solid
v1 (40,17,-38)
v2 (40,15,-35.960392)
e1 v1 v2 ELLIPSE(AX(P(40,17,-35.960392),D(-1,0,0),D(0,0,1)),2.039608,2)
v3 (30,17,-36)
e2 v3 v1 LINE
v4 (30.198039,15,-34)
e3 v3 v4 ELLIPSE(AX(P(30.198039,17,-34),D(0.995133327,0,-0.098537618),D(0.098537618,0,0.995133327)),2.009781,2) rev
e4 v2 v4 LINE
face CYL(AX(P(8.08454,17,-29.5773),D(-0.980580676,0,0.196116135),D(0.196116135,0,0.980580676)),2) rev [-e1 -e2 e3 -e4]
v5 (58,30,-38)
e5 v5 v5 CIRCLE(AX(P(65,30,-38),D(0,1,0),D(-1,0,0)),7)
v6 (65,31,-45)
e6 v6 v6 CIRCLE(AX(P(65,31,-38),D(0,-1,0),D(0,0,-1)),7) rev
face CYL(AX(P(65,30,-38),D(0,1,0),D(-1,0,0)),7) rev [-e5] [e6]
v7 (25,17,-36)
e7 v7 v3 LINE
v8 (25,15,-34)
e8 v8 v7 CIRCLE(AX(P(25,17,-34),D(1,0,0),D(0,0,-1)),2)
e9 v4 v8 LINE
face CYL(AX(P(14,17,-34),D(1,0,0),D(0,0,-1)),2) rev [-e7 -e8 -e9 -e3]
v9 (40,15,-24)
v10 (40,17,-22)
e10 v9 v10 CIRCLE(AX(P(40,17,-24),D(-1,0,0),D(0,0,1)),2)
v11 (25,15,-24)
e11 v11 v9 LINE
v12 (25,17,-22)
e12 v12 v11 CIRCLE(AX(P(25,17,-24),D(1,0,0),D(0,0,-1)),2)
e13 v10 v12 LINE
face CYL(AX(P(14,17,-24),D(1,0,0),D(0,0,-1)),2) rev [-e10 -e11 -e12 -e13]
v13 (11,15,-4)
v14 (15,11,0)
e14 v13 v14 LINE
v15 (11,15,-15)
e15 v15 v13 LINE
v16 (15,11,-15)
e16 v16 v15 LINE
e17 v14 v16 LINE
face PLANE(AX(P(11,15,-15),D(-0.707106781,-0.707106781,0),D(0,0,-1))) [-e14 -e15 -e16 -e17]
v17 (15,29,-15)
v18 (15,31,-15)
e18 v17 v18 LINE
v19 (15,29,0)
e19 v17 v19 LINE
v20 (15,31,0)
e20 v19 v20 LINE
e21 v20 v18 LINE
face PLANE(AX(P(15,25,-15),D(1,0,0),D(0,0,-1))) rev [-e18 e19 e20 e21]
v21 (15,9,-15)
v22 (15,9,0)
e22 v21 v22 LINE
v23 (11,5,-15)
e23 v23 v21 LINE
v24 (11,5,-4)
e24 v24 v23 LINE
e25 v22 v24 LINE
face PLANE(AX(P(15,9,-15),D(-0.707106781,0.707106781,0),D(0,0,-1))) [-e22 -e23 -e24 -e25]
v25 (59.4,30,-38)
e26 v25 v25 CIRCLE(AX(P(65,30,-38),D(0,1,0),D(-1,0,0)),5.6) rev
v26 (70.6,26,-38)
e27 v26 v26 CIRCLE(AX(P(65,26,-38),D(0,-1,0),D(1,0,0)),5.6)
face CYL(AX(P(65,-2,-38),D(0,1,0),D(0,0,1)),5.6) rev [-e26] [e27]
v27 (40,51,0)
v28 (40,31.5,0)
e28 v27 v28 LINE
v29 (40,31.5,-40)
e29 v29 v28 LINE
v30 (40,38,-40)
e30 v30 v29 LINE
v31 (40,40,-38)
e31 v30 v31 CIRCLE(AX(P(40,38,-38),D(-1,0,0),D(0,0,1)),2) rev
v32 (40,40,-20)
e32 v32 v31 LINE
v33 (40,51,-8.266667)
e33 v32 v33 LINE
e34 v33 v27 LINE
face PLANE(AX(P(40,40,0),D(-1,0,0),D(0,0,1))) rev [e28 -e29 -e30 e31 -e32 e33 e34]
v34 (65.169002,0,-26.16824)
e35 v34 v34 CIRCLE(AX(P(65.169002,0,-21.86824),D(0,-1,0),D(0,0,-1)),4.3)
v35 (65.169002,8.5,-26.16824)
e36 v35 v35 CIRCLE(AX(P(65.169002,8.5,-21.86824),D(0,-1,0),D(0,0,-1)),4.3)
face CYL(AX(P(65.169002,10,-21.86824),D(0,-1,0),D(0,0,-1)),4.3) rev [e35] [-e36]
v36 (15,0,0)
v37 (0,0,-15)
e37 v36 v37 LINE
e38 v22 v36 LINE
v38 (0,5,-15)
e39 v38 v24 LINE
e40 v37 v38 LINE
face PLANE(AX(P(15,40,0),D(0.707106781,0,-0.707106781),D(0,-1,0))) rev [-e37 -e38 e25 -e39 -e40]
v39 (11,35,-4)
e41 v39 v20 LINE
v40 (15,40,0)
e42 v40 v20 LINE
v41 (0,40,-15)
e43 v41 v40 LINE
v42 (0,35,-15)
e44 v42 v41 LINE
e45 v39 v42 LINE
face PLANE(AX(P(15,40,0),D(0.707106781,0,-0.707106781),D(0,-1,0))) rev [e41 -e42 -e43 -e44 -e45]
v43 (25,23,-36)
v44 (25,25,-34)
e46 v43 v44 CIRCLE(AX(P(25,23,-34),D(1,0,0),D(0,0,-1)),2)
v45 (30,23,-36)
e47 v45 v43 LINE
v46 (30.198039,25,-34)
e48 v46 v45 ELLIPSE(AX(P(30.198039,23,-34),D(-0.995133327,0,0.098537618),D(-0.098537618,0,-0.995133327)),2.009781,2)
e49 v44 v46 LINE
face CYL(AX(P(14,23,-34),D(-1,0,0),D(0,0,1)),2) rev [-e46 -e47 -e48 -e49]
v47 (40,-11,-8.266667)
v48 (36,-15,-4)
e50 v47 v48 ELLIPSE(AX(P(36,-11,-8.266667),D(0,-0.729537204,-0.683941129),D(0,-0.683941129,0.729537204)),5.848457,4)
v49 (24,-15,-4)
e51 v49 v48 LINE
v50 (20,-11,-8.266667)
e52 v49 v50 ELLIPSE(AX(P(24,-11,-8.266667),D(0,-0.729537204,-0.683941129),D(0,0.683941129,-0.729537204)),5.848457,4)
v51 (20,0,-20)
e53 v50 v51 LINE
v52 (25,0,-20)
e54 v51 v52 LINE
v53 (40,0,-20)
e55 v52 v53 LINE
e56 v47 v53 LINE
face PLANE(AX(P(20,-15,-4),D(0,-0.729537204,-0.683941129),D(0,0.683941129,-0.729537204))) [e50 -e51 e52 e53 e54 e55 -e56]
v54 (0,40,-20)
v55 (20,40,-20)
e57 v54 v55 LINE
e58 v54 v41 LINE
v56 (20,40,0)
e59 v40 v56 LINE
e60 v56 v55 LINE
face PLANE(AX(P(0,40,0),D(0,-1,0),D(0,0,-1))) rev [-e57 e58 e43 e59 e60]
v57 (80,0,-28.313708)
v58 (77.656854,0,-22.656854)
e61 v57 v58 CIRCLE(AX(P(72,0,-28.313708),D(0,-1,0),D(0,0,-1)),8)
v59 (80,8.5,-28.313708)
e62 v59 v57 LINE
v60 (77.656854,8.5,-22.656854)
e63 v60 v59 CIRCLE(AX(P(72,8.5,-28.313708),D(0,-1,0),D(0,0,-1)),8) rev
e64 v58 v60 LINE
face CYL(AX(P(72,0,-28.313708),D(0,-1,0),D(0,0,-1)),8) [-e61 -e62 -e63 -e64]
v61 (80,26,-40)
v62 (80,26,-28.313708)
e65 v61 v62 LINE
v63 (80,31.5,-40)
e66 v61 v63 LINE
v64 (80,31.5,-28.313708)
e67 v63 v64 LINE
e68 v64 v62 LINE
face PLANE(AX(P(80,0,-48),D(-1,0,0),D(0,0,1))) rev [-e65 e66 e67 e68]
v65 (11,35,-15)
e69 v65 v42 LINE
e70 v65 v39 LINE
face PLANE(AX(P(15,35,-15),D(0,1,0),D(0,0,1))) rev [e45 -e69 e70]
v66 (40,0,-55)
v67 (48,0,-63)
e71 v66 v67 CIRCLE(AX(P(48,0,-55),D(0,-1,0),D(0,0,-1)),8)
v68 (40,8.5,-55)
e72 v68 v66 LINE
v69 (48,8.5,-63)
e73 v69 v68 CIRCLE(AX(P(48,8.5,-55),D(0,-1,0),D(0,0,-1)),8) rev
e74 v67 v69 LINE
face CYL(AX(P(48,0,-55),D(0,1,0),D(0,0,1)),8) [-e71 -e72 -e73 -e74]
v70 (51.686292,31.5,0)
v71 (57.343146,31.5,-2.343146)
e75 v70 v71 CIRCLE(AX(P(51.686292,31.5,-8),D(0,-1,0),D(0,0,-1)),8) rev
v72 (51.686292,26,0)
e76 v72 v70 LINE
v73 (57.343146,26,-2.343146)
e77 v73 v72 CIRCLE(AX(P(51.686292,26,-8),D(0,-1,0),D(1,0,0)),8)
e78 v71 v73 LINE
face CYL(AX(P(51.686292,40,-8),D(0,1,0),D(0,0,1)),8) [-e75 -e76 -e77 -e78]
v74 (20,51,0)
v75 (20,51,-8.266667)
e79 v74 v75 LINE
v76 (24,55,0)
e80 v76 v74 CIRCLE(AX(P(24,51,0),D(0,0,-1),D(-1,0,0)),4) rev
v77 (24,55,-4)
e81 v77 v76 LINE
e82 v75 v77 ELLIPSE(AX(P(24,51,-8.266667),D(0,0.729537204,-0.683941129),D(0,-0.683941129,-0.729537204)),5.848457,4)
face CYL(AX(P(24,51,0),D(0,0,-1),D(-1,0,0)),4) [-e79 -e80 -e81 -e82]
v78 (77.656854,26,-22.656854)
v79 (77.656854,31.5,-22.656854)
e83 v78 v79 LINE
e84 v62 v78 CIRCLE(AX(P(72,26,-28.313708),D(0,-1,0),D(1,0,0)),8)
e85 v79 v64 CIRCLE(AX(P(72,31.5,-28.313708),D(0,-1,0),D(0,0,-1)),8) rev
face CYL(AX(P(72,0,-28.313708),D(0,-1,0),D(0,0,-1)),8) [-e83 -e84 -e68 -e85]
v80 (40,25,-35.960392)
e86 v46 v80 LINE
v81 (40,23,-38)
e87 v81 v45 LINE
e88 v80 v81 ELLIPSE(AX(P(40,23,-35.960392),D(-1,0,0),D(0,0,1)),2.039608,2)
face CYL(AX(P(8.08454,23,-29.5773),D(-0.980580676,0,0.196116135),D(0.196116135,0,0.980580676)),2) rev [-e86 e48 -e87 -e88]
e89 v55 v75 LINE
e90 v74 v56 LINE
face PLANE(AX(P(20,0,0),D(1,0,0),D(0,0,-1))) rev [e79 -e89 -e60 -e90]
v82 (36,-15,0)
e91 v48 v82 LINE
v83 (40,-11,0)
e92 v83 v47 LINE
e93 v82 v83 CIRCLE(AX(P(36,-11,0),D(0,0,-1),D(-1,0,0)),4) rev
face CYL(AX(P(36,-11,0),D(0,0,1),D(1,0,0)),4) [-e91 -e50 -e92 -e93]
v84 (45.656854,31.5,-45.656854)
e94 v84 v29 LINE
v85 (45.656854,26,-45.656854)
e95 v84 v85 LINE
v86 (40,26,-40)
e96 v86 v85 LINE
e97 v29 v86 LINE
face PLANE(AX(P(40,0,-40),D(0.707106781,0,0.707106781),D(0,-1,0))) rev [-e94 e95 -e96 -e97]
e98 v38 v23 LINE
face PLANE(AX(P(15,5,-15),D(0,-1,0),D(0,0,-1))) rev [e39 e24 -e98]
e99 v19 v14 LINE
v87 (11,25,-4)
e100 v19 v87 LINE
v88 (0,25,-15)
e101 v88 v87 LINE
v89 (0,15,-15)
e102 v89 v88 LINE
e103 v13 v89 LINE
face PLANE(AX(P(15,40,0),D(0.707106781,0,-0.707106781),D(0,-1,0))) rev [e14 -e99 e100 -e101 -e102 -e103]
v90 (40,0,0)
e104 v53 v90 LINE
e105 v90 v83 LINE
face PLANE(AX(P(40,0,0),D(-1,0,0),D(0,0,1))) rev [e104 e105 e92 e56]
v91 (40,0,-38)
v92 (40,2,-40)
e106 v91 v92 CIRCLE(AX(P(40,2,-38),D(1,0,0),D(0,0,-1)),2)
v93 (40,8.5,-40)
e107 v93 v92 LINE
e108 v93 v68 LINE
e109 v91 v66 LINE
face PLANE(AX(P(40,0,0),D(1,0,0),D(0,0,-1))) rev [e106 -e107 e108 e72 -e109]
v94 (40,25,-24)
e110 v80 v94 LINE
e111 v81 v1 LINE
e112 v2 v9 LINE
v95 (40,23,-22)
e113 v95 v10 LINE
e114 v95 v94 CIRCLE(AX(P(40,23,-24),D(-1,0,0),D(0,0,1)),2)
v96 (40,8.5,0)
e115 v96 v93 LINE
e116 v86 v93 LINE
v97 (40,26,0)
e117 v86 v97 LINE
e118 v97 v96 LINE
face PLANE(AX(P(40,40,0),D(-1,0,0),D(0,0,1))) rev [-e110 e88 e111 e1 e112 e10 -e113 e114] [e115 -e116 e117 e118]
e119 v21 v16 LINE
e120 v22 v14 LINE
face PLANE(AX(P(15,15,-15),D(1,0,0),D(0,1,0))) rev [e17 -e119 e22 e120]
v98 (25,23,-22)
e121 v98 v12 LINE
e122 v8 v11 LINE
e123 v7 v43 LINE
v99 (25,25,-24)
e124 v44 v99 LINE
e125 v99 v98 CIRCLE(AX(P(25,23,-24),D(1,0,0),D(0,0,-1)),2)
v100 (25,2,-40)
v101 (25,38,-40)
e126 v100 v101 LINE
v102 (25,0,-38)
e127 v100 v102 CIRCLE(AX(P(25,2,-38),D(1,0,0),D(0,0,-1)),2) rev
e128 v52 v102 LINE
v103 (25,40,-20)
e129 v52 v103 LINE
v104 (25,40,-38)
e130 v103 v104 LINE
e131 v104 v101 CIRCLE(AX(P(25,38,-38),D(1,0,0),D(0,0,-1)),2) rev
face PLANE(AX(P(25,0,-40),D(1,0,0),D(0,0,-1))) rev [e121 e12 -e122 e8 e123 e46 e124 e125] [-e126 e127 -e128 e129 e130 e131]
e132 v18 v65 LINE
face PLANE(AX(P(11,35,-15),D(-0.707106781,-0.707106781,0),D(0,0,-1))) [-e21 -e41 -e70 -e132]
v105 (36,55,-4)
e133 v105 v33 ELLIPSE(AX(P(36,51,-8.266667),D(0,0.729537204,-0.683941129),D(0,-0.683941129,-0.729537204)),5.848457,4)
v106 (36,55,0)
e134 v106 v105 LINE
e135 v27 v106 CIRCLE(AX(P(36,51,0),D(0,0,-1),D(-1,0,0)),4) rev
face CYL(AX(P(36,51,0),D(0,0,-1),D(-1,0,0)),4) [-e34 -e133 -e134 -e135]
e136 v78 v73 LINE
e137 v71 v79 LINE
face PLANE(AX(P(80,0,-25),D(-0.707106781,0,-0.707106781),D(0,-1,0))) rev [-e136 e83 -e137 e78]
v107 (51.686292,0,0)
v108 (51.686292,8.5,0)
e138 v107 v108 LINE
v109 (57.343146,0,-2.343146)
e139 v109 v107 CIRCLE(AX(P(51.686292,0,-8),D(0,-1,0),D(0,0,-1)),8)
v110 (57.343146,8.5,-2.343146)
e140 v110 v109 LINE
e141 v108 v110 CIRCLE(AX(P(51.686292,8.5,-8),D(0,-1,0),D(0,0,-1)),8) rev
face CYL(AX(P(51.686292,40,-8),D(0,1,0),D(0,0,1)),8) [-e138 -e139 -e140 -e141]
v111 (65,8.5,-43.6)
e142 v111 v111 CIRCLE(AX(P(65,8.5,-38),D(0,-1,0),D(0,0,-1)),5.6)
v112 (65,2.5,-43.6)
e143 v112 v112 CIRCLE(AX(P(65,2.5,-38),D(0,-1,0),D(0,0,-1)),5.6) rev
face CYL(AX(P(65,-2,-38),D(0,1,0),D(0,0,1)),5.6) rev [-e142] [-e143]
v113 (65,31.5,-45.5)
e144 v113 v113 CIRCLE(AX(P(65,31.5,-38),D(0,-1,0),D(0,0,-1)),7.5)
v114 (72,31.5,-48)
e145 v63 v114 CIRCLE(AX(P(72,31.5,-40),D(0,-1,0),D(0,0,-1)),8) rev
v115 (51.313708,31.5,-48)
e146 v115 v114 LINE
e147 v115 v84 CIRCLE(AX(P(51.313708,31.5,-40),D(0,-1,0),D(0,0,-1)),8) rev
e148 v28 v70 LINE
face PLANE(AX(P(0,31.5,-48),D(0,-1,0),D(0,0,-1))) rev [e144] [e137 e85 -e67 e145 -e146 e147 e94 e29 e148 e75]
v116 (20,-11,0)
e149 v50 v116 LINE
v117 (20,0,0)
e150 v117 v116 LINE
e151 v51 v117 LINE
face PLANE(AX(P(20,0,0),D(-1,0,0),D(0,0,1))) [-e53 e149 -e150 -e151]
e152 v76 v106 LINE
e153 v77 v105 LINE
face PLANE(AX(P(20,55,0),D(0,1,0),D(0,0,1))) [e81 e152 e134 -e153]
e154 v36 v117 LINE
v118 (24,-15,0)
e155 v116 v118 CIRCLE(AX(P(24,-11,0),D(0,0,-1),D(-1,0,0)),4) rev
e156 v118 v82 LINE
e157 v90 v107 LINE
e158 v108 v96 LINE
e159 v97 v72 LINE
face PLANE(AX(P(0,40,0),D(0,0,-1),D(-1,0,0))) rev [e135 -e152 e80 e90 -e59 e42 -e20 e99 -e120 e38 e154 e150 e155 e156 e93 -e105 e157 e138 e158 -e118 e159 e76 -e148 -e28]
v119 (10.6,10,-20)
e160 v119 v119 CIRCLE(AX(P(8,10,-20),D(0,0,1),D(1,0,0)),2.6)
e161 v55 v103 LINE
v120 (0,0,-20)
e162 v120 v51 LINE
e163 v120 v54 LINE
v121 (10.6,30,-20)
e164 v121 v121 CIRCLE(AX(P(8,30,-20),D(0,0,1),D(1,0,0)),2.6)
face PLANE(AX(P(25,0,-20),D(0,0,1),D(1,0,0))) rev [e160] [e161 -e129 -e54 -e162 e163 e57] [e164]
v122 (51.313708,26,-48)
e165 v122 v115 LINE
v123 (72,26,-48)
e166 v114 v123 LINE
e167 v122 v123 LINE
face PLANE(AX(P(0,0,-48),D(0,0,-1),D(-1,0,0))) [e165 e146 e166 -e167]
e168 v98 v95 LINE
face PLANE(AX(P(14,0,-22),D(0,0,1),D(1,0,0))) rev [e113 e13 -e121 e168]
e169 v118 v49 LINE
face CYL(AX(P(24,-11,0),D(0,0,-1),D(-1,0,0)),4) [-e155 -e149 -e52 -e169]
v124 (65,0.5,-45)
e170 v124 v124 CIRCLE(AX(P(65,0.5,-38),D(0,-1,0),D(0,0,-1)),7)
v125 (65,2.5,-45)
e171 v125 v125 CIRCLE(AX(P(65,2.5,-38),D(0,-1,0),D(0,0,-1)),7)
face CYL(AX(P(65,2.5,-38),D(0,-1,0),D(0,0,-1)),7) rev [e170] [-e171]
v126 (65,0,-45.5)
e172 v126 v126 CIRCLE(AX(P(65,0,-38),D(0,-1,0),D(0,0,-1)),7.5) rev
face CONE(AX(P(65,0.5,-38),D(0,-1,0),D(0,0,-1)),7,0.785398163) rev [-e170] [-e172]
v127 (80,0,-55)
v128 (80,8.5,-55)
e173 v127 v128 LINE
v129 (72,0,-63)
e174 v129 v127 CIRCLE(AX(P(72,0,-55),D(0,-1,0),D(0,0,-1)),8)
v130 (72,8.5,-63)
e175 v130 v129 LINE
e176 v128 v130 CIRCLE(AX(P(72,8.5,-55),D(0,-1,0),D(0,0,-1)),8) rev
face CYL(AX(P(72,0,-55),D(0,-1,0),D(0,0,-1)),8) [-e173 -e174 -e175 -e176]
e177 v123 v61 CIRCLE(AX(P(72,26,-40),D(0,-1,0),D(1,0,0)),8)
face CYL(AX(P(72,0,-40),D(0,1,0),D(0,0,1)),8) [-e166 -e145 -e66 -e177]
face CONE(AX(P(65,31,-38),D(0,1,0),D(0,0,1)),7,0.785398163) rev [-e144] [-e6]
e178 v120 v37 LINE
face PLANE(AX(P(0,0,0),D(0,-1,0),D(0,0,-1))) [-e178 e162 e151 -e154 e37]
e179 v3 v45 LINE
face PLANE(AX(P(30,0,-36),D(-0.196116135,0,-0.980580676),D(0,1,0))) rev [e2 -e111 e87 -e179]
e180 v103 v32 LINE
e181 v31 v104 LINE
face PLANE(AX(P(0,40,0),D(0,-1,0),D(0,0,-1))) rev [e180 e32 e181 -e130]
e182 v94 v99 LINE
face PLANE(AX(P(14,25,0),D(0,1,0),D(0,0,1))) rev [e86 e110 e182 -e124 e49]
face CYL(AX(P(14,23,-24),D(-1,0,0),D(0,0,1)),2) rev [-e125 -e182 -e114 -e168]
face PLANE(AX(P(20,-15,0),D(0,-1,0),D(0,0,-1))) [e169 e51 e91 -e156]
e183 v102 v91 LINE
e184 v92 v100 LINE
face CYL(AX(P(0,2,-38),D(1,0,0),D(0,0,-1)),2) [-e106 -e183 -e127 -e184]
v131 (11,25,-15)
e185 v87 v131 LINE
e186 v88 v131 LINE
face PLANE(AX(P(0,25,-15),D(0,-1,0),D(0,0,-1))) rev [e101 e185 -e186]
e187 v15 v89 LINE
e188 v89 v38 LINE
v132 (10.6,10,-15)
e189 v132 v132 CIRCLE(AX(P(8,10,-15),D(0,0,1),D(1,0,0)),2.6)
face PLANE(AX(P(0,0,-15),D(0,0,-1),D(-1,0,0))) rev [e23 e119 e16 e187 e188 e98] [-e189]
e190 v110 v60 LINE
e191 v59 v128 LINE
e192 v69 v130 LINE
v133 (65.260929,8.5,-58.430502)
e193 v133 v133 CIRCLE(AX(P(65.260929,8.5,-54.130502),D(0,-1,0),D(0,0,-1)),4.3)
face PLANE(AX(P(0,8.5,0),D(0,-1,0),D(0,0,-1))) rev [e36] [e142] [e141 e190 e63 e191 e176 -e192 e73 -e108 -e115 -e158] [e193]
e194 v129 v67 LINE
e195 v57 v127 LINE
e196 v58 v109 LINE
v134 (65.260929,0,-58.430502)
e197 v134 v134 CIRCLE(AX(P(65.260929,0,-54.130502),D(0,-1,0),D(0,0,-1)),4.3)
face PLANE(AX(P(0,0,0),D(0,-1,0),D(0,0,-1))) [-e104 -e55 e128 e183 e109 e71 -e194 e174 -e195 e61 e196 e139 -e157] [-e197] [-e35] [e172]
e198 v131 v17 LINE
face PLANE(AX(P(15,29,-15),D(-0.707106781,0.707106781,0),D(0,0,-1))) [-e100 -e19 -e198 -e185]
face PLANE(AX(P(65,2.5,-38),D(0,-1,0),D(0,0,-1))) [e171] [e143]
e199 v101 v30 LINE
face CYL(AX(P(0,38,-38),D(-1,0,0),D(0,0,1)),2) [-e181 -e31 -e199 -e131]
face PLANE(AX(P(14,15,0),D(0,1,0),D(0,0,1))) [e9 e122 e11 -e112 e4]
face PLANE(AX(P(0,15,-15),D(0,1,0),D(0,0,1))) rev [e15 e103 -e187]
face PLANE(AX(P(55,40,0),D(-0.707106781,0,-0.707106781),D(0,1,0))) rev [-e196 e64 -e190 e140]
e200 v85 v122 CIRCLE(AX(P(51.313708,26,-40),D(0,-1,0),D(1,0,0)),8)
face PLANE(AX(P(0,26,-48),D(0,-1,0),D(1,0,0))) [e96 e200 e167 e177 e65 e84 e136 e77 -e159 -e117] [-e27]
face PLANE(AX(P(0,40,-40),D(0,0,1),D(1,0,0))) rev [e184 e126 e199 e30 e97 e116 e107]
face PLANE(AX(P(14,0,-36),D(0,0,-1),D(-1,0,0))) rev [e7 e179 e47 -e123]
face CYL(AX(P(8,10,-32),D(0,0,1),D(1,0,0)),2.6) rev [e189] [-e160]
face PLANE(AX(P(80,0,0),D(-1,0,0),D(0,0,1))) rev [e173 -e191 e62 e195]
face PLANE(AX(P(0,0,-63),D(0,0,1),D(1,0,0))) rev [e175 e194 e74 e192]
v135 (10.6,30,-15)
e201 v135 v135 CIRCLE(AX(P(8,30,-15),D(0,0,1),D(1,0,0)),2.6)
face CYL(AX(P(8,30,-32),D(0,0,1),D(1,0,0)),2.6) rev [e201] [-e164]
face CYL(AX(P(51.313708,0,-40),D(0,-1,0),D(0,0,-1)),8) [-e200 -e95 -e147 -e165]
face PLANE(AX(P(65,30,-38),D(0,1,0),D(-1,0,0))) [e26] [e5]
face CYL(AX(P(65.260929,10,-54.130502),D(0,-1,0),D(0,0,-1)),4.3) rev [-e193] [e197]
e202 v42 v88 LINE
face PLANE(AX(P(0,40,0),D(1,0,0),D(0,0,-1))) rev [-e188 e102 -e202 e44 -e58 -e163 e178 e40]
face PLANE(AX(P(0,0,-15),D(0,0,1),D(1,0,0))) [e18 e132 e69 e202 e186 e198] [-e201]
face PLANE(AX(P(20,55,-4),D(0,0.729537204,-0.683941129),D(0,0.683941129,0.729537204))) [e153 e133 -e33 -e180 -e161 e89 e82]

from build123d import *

# Parameters (mm, degrees)
SKETCH1_W                = 40
SKETCH1_H                = 40
BOSS_EXTRUDE1_DEPTH      = 40
SKETCH2_W                = 25
SKETCH2_H                = 20
CUT_EXTRUDE1_DEPTH       = 40
CHAMFER1_SIZE            = 15
CUT_EXTRUDE2_DEPTH       = 15
CHAMFER2_SIZE            = 4
SKETCH4_R                = 2.6
CUT_EXTRUDE3_DEPTH       = 17
BOSS_EXTRUDE2_DEPTH      = 8
BOSS_EXTRUDE2_DEPTH_BACK = 40
SKETCH5_W                = 40
SKETCH5_H                = 8.5
SKETCH5_H_2              = 5.5
SKETCH10_W               = 14
SKETCH10_H               = 10
CUT_EXTRUDE5_DEPTH       = 26
CHAMFER5_SIZE            = 8
SKETCH8_R                = 5.6
CUT_EXTRUDE4_DEPTH       = 34
BOSS_EXTRUDE3_DEPTH      = 20
FILLET3_R                = 4
FILLET4_R                = 2
SKETCH12_R               = 7
CUT_EXTRUDE6_DEPTH       = 1.5
CUT_EXTRUDE7_START       = -2.5
SKETCH13_R               = 7
CUT_EXTRUDE7_DEPTH       = 2.5
CHAMFER7_SIZE            = 25
FILLET6_R                = 8
CHAMFER8_SIZE            = 2
CHAMFER8_SIZE2           = 10
FILLET7_R                = 2
SKETCH14_W               = 40
SKETCH14_H               = 8.5
BOSS_EXTRUDE4_DEPTH      = 15
SKETCH15_R               = 4.3
CUT_EXTRUDE8_DEPTH       = 10
FILLET8_R                = 8
CHAMFER10_SIZE           = 0.5


with BuildPart() as part:
    # Sketch1 → Boss-Extrude1 (new body)
    with BuildSketch(Plane(origin=(0, 0, 0), x_dir=(1, 0, 0), z_dir=(0, 1, 0))):
        with Locations((20, 20)):
            Rectangle(SKETCH1_W, SKETCH1_H)
    extrude(amount=BOSS_EXTRUDE1_DEPTH)

    # Sketch2 → Cut-Extrude1 (cut)
    with BuildSketch(Plane(origin=(0, 40, 0), x_dir=(1, 0, 0), z_dir=(0, 1, 0))):
        with Locations((12.5, 30)):
            Rectangle(SKETCH2_W, SKETCH2_H)
    extrude(amount=-CUT_EXTRUDE1_DEPTH, mode=Mode.SUBTRACT)

    # Chamfer1
    chamfer1_edges = [part.edges().sort_by_distance(p)[0] for p in [
        (0, 20, 0),
    ]]
    chamfer(chamfer1_edges, length=CHAMFER1_SIZE)

    # Sketch3 → Cut-Extrude2 (cut)
    with BuildSketch(Plane.XY):
        Polygon((0, 10), (0, 15), (15, 15), (15, 5), (0, 5), align=None)
        Polygon((0, 30), (0, 25), (15, 25), (15, 35), (0, 35), align=None)
    extrude(amount=-CUT_EXTRUDE2_DEPTH, mode=Mode.SUBTRACT)

    # Chamfer2
    chamfer2_edges = [part.edges().sort_by_distance(p)[0] for p in [
        (15, 35, -7.5),
        (15, 25, -7.5),
        (15, 15, -7.5),
        (15, 5, -7.5),
    ]]
    chamfer(chamfer2_edges, length=CHAMFER2_SIZE)

    # Sketch4 → Cut-Extrude3 (cut)
    with BuildSketch(Plane.XY.offset(-15)):
        with Locations((8, 30)):
            Circle(SKETCH4_R)
        with Locations((8, 10)):
            Circle(SKETCH4_R)
    extrude(amount=-CUT_EXTRUDE3_DEPTH, mode=Mode.SUBTRACT)

    # Sketch5 → Boss-Extrude2 (add, two sides: drawn at the far end of the back side and taken through both)
    with BuildSketch(Plane(origin=(0, 0, -40), x_dir=(-1, 0, 0), z_dir=(0, 0, -1)).offset(-BOSS_EXTRUDE2_DEPTH_BACK)):
        with Locations((-60, 4.25)):
            Rectangle(SKETCH5_W, SKETCH5_H)
        with Locations((-60, 28.75)):
            Rectangle(SKETCH5_W, SKETCH5_H_2)
    extrude(amount=BOSS_EXTRUDE2_DEPTH + BOSS_EXTRUDE2_DEPTH_BACK)

    # Sketch10 → Cut-Extrude5 (cut)
    with BuildSketch(Plane(origin=(40, 0, 0), x_dir=(0, 0, -1), z_dir=(1, 0, 0))):
        with Locations((29, 20)):
            Rectangle(SKETCH10_W, SKETCH10_H)
    extrude(amount=-CUT_EXTRUDE5_DEPTH, mode=Mode.SUBTRACT)

    # Chamfer5
    chamfer5_edges = [part.edges().sort_by_distance(p)[0] for p in [
        (40, 28.75, -48),
    ]]
    chamfer(chamfer5_edges, length=CHAMFER5_SIZE - 0.0001)  # a hair under: the kernel refuses the full size

    # Sketch8 → Cut-Extrude4 (cut)
    with BuildSketch(Plane(origin=(0, 32, 0), x_dir=(1, 0, 0), z_dir=(0, 1, 0))):
        with Locations((65, 38)):
            Circle(SKETCH8_R)
    extrude(amount=-CUT_EXTRUDE4_DEPTH, mode=Mode.SUBTRACT)

    # Sketch9 → Boss-Extrude3 (add)
    with BuildSketch(Plane(origin=(40, 0, 0), x_dir=(0, 0, -1), z_dir=(1, 0, 0))):
        Polygon((0, 40), (0, 55), (4, 55), (20, 40), align=None)
        Polygon((0, 0), (0, -15), (4, -15), (20, 0), align=None)
    extrude(amount=-BOSS_EXTRUDE3_DEPTH)

    # Fillet3
    fillet3_edges = [part.edges().sort_by_distance(p)[0] for p in [
        (20, 55, -2),
        (40, 55, -2),
        (20, -15, -2),
        (40, -15, -2),
    ]]
    fillet(fillet3_edges, radius=FILLET3_R)

    # Fillet4
    fillet4_edges = [part.edges().sort_by_distance(p)[0] for p in [
        (32.5, 40, -40),
        (32.5, 0, -40),
    ]]
    fillet(fillet4_edges, radius=FILLET4_R)

    # Sketch12 → Cut-Extrude6 (cut)
    with BuildSketch(Plane(origin=(0, 31.5, 0), x_dir=(1, 0, 0), z_dir=(0, 1, 0))):
        with Locations(Location((65, 38, 0), (0, 0, 180))):
            Circle(SKETCH12_R)
    extrude(amount=-CUT_EXTRUDE6_DEPTH, mode=Mode.SUBTRACT)

    # Sketch13 → Cut-Extrude7 (cut)
    with BuildSketch(Plane.XZ.offset(CUT_EXTRUDE7_START)):
        with Locations(Location((65, -38, 0), (0, 0, 180))):
            Circle(SKETCH13_R)
    extrude(amount=CUT_EXTRUDE7_DEPTH, mode=Mode.SUBTRACT)

    # Chamfer7
    chamfer7_edges = [part.edges().sort_by_distance(p)[0] for p in [
        (80, 4.25, 0),
        (80, 28.75, 0),
    ]]
    chamfer(chamfer7_edges, length=CHAMFER7_SIZE)

    # Fillet6
    fillet6_edges = [part.edges().sort_by_distance(p)[0] for p in [
        (80, 28.75, -48),
        (47.9999, 28.75, -48),
        (55, 28.75, 0),
        (55, 4.25, 0),
        (80, 4.25, -25),
        (80, 28.75, -25),
    ]]
    fillet(fillet6_edges, radius=FILLET6_R)

    # Chamfer8
    chamfer8_edges = [part.edges().sort_by_distance(p)[0] for p in [
        (40, 20, -36),
    ]]
    chamfer8_side = [part.faces().sort_by_distance(p)[0] for p in [
        (40, 16.5625, -17.75),
    ]]
    chamfer(chamfer8_edges, length=CHAMFER8_SIZE, length2=CHAMFER8_SIZE2, reference=chamfer8_side[0])

    # Fillet7
    fillet7_edges = [part.edges().sort_by_distance(p)[0] for p in [
        (27.5, 15, -36),
        (32.5, 15, -22),
        (32.5, 25, -22),
        (27.5, 25, -36),
        (35, 25, -37),
        (35, 15, -37),
    ]]
    fillet(fillet7_edges, radius=FILLET7_R)

    # Sketch14 → Boss-Extrude4 (add)
    with BuildSketch(Plane(origin=(0, 0, -48), x_dir=(-1, 0, 0), z_dir=(0, 0, -1))):
        with Locations((-60, 4.25)):
            Rectangle(SKETCH14_W, SKETCH14_H)
    extrude(amount=BOSS_EXTRUDE4_DEPTH)

    # Sketch15 → Cut-Extrude8 (cut)
    with BuildSketch(Plane.XZ):
        with Locations(Location((65.260929409, -54.130501699, 0), (0, 0, 270))):
            Circle(SKETCH15_R)
        with Locations(Location((65.16900186, -21.868239994, 0), (0, 0, 270))):
            Circle(SKETCH15_R)
    extrude(amount=-CUT_EXTRUDE8_DEPTH, mode=Mode.SUBTRACT)

    # Fillet8
    fillet8_edges = [part.edges().sort_by_distance(p)[0] for p in [
        (80, 4.25, -63),
        (40, 4.25, -63),
    ]]
    fillet(fillet8_edges, radius=FILLET8_R)

    # Chamfer10
    chamfer10_edges = [part.edges().sort_by_distance(p)[0] for p in [
        (72, 31.5, -38),
        (72, 0, -38),
    ]]
    chamfer(chamfer10_edges, length=CHAMFER10_SIZE)


solid = part.part
